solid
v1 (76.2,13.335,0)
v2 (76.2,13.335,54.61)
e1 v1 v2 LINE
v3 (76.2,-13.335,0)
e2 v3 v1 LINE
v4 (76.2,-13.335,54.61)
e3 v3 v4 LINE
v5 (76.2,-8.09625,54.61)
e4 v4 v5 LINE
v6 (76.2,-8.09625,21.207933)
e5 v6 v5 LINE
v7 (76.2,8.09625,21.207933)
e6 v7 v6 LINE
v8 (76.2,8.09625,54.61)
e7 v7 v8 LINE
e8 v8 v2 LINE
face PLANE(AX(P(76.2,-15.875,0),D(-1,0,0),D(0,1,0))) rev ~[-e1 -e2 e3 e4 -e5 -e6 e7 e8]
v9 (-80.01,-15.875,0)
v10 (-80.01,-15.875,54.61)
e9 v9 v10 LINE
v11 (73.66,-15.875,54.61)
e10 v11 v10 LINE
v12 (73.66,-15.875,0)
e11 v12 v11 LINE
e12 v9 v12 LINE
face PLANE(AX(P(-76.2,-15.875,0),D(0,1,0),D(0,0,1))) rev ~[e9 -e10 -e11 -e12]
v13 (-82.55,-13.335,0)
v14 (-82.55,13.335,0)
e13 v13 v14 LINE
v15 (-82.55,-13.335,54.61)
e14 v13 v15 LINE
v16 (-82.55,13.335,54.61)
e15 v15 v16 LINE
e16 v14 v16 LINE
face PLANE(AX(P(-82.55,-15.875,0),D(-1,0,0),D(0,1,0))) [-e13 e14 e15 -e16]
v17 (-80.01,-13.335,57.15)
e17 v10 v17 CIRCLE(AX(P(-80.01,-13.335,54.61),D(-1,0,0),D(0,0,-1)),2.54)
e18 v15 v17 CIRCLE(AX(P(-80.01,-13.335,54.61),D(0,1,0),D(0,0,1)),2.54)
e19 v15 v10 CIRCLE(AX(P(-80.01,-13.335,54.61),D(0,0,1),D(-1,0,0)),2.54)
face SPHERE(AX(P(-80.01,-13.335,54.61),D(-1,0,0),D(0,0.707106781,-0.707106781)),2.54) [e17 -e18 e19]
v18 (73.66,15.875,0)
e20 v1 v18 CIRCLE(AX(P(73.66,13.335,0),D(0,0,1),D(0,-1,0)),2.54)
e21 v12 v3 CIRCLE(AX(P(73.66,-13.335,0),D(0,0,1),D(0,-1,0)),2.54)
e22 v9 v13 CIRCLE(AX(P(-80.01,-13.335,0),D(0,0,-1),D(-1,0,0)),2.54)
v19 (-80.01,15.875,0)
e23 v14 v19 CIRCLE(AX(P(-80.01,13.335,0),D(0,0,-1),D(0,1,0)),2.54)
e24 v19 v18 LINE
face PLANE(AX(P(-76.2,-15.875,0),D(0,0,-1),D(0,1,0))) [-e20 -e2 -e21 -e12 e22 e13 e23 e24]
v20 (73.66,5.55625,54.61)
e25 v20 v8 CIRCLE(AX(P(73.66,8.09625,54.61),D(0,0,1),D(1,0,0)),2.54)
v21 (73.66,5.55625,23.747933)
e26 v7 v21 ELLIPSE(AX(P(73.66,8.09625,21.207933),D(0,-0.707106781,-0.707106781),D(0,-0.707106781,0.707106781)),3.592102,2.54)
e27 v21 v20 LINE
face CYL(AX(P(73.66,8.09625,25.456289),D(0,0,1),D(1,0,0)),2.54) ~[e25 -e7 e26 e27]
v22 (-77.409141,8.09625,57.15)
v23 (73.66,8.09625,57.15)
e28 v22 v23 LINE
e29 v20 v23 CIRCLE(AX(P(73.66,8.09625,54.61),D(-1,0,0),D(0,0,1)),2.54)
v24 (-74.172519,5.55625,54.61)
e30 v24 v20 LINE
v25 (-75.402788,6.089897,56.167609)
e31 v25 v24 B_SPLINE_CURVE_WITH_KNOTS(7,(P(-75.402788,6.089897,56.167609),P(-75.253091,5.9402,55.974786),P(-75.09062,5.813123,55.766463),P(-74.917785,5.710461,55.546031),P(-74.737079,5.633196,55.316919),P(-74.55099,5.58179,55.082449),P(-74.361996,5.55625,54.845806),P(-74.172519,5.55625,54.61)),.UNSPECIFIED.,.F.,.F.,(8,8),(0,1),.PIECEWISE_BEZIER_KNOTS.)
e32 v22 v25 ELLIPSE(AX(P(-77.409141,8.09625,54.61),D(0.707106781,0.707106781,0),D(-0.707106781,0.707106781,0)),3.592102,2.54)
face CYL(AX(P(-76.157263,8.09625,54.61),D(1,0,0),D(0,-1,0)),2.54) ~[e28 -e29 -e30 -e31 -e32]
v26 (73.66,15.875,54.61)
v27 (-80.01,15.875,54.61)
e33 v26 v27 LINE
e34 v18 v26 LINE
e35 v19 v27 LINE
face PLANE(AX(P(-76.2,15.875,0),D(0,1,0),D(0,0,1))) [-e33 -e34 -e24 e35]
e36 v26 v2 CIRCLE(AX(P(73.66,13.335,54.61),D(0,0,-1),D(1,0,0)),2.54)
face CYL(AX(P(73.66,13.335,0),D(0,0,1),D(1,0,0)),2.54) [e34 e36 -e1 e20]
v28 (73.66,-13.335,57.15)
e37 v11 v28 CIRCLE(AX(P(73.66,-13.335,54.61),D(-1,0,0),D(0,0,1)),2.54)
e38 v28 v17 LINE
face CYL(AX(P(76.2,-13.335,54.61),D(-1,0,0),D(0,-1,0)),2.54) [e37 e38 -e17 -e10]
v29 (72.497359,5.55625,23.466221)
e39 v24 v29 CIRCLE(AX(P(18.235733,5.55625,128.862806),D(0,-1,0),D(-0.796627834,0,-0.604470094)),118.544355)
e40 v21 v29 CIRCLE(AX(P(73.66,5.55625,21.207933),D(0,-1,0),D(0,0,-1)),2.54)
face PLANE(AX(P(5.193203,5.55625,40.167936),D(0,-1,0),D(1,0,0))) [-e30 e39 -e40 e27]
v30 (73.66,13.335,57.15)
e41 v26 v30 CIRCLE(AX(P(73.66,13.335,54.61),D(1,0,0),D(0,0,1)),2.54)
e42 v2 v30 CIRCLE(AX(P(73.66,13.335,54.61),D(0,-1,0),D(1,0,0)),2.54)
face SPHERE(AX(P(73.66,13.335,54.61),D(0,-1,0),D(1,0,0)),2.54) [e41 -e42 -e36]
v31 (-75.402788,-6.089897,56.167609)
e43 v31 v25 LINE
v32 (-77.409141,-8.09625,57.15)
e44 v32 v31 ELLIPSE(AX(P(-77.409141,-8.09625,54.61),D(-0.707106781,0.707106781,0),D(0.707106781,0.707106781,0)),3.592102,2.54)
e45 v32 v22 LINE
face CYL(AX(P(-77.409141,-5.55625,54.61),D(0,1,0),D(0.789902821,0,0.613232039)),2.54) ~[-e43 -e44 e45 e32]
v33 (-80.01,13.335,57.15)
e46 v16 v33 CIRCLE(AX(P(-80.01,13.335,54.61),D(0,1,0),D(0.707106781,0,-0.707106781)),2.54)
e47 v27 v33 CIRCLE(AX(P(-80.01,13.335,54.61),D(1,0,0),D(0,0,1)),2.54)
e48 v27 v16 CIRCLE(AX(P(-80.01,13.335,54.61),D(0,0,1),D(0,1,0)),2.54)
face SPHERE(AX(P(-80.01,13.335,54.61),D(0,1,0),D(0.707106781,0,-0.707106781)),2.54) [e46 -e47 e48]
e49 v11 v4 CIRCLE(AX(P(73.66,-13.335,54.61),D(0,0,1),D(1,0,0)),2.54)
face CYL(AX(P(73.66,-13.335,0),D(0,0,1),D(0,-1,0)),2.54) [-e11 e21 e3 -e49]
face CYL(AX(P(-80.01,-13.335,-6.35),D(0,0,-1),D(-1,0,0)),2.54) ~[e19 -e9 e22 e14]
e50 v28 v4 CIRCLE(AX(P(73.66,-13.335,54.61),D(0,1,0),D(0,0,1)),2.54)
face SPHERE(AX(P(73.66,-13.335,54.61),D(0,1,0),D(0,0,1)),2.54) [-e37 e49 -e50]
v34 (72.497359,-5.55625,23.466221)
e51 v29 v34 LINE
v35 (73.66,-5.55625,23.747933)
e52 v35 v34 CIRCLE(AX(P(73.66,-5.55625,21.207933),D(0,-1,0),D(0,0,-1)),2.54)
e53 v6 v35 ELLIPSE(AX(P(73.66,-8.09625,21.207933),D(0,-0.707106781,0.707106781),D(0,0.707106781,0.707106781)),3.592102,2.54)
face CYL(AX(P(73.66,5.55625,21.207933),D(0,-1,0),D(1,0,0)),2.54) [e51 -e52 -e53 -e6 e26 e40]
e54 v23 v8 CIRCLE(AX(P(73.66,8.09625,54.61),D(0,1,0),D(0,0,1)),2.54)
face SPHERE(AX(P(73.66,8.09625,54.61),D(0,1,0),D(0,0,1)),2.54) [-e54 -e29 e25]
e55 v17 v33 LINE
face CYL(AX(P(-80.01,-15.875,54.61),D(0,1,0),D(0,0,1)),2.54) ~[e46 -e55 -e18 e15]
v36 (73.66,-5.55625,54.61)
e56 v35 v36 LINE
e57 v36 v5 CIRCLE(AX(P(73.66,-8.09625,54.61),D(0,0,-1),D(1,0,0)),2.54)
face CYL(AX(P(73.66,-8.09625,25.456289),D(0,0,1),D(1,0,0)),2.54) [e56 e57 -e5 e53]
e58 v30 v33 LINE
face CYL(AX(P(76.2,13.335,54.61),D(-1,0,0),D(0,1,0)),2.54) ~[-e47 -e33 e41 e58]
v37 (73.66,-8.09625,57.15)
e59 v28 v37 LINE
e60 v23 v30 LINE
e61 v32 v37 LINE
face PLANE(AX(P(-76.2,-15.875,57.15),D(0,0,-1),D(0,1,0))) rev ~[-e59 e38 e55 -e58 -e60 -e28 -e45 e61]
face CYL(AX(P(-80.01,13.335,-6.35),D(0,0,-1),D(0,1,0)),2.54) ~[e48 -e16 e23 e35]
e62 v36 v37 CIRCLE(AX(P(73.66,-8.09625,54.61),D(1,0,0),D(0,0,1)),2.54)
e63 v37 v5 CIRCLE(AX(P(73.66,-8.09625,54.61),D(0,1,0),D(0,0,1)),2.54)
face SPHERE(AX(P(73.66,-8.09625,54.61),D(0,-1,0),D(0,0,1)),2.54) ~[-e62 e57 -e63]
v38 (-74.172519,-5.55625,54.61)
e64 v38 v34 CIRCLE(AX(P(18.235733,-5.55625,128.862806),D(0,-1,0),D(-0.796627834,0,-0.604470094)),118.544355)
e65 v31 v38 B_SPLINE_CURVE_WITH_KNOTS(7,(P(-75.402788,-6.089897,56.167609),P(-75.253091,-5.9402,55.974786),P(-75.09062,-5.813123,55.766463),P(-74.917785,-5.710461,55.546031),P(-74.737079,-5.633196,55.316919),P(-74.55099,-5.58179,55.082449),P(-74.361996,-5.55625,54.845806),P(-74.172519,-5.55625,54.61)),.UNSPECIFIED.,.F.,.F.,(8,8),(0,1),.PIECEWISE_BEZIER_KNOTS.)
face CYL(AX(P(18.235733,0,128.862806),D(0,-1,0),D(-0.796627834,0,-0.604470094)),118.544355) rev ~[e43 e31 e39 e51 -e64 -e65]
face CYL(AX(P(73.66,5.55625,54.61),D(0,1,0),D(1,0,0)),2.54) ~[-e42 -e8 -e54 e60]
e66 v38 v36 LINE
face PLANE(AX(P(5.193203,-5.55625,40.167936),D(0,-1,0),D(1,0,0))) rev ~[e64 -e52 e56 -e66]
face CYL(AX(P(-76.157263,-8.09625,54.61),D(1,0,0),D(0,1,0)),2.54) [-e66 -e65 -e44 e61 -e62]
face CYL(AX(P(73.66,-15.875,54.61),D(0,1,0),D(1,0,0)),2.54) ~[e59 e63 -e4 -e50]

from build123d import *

# Parameters (mm, degrees)
F0_W          = 152.4
F0_H          = 31.75
F1_DEPTH      = 57.15
F3_DEPTH      = 5.55625
F3_DEPTH_BACK = 5.55625
F4_DEPTH      = 6.35
F5_R          = 2.54
F6_T1_DEPTH   = 60.96
F6_S5_W       = 2.54
F6_S5_H       = 2.54
F6_T6_DEPTH   = 2.54
F6_S11_W      = 2.54
F6_S11_H      = 2.54
F6_T12_DEPTH  = 2.54


# Not quite as in the source:
# - a fillet or chamfer that OpenCascade refuses, or shapes differently, is made with other operations: its cross-section is extruded or revolved along the edge and cut away or added


with BuildPart() as f1:
    # F0 (on Top) → F1 (new body)
    with BuildSketch(Plane.XY):
        Rectangle(F0_W, F0_H)
    extrude(amount=F1_DEPTH)

    # F2 (on Front) → F3 (cut, two sides)
    with BuildSketch(Plane.XZ) as f3_sk:
        with BuildLine():
            Line((76.2, 57.2062885404), (0, 57.2062885404))
            Line((0, 57.2062885404), (-76.2, 57.2062885404))
            ThreePointArc((-76.2, 57.2062885404), (-5.9418927192, 12.810203488), (76.2, 25.4562885404))
            Line((76.2, 25.4562885404), (76.2, 57.2062885404))
        make_face()
    extrude(amount=F3_DEPTH, mode=Mode.SUBTRACT)
    extrude(f3_sk.sketch, amount=-F3_DEPTH_BACK, mode=Mode.SUBTRACT)

    # F4 (add): a face of the model
    f4_faces = [f1.faces().sort_by_distance(p)[0] for p in [
        (-76.2, 0, 28.575),
    ]]
    extrude(f4_faces, amount=F4_DEPTH)

    # F5
    f5_edges = [f1.edges().sort_by_distance(p)[0] for p in [
        (76.2, -10.715625, 57.15),
        (-3.175, -15.875, 57.15),
        (76.2, -15.875, 28.575),
        (76.2, 10.715625, 57.15),
        (76.2, 15.875, 28.575),
        (-3.175, 15.875, 57.15),
        (-82.55, 0, 57.15),
        (0.021369, -5.55625, 57.15),
        (-76.157263, 0, 57.15),
        (0.021369, 5.55625, 57.15),
        (76.2, 5.55625, 41.303144),
        (76.2, -5.55625, 41.303144),
        (76.2, 0, 25.456289),
    ]]
    fillet(f5_edges, radius=F5_R)

    # F6: fillet of radius 2.54 on 2 edges, made by hand

    # F6_s2 → F6_t1 (cut)
    with BuildSketch(Plane.XY.offset(-6.35)):
        with BuildLine():
            ThreePointArc((-80.01, 15.875), (-81.8060512242, 15.1310512242), (-82.55, 13.335))
            Line((-82.55, 13.335), (-82.55, 15.875))
            Line((-82.55, 15.875), (-80.01, 15.875))
        make_face()
        with BuildLine():
            ThreePointArc((-82.55, -13.335), (-81.8060512242, -15.1310512242), (-80.01, -15.875))
            Line((-80.01, -15.875), (-82.55, -15.875))
            Line((-82.55, -15.875), (-82.55, -13.335))
        make_face()
    extrude(amount=F6_T1_DEPTH, mode=Mode.SUBTRACT)


with BuildPart() as f6_tool4:
    # F6_s5 → F6_t6 (new body)
    with BuildSketch(Plane.YZ.offset(-80.01)):
        with Locations((-14.605, 55.88)):
            Rectangle(F6_S5_W, F6_S5_H)
    extrude(amount=-F6_T6_DEPTH)

    # F6_s7 → F6_t8 (revolve, cut)
    with BuildSketch(Plane(origin=(-80.01, -13.335, 54.61), x_dir=(0, 0.7071067812, -0.7071067812), z_dir=(0, 0.7071067812, 0.7071067812))):
        with BuildLine():
            ThreePointArc((0, -2.54), (2.54, 0), (0, 2.54))
            Line((0, 2.54), (0, -2.54))
        make_face()
    revolve(axis=Axis((-80.01, -13.335, 54.61), (-1, 0, 0)), mode=Mode.SUBTRACT)


with BuildPart() as f1_1:
    add(f1.part)

    # F6_t3: cut F6_tool4
    add(f6_tool4.part, mode=Mode.SUBTRACT)


with BuildPart() as f6_tool10:
    # F6_s11 → F6_t12 (new body)
    with BuildSketch(Plane.XZ.offset(-13.335)):
        with Locations((-81.28, 55.88)):
            Rectangle(F6_S11_W, F6_S11_H)
    extrude(amount=-F6_T12_DEPTH)

    # F6_s13 → F6_t14 (revolve, cut)
    with BuildSketch(Plane(origin=(-80.01, 13.335, 54.61), x_dir=(0.7071067812, 0, -0.7071067812), z_dir=(0.7071067812, 0, 0.7071067812))):
        with BuildLine():
            ThreePointArc((0, -2.54), (2.54, 0), (0, 2.54))
            Line((0, 2.54), (0, -2.54))
        make_face()
    revolve(axis=Axis((-80.01, 13.335, 54.61), (0, 1, 0)), mode=Mode.SUBTRACT)


with BuildPart() as f1_2:
    add(f1_1.part)

    # F6_t9: cut F6_tool10
    add(f6_tool10.part, mode=Mode.SUBTRACT)


solid = f1_2.part
